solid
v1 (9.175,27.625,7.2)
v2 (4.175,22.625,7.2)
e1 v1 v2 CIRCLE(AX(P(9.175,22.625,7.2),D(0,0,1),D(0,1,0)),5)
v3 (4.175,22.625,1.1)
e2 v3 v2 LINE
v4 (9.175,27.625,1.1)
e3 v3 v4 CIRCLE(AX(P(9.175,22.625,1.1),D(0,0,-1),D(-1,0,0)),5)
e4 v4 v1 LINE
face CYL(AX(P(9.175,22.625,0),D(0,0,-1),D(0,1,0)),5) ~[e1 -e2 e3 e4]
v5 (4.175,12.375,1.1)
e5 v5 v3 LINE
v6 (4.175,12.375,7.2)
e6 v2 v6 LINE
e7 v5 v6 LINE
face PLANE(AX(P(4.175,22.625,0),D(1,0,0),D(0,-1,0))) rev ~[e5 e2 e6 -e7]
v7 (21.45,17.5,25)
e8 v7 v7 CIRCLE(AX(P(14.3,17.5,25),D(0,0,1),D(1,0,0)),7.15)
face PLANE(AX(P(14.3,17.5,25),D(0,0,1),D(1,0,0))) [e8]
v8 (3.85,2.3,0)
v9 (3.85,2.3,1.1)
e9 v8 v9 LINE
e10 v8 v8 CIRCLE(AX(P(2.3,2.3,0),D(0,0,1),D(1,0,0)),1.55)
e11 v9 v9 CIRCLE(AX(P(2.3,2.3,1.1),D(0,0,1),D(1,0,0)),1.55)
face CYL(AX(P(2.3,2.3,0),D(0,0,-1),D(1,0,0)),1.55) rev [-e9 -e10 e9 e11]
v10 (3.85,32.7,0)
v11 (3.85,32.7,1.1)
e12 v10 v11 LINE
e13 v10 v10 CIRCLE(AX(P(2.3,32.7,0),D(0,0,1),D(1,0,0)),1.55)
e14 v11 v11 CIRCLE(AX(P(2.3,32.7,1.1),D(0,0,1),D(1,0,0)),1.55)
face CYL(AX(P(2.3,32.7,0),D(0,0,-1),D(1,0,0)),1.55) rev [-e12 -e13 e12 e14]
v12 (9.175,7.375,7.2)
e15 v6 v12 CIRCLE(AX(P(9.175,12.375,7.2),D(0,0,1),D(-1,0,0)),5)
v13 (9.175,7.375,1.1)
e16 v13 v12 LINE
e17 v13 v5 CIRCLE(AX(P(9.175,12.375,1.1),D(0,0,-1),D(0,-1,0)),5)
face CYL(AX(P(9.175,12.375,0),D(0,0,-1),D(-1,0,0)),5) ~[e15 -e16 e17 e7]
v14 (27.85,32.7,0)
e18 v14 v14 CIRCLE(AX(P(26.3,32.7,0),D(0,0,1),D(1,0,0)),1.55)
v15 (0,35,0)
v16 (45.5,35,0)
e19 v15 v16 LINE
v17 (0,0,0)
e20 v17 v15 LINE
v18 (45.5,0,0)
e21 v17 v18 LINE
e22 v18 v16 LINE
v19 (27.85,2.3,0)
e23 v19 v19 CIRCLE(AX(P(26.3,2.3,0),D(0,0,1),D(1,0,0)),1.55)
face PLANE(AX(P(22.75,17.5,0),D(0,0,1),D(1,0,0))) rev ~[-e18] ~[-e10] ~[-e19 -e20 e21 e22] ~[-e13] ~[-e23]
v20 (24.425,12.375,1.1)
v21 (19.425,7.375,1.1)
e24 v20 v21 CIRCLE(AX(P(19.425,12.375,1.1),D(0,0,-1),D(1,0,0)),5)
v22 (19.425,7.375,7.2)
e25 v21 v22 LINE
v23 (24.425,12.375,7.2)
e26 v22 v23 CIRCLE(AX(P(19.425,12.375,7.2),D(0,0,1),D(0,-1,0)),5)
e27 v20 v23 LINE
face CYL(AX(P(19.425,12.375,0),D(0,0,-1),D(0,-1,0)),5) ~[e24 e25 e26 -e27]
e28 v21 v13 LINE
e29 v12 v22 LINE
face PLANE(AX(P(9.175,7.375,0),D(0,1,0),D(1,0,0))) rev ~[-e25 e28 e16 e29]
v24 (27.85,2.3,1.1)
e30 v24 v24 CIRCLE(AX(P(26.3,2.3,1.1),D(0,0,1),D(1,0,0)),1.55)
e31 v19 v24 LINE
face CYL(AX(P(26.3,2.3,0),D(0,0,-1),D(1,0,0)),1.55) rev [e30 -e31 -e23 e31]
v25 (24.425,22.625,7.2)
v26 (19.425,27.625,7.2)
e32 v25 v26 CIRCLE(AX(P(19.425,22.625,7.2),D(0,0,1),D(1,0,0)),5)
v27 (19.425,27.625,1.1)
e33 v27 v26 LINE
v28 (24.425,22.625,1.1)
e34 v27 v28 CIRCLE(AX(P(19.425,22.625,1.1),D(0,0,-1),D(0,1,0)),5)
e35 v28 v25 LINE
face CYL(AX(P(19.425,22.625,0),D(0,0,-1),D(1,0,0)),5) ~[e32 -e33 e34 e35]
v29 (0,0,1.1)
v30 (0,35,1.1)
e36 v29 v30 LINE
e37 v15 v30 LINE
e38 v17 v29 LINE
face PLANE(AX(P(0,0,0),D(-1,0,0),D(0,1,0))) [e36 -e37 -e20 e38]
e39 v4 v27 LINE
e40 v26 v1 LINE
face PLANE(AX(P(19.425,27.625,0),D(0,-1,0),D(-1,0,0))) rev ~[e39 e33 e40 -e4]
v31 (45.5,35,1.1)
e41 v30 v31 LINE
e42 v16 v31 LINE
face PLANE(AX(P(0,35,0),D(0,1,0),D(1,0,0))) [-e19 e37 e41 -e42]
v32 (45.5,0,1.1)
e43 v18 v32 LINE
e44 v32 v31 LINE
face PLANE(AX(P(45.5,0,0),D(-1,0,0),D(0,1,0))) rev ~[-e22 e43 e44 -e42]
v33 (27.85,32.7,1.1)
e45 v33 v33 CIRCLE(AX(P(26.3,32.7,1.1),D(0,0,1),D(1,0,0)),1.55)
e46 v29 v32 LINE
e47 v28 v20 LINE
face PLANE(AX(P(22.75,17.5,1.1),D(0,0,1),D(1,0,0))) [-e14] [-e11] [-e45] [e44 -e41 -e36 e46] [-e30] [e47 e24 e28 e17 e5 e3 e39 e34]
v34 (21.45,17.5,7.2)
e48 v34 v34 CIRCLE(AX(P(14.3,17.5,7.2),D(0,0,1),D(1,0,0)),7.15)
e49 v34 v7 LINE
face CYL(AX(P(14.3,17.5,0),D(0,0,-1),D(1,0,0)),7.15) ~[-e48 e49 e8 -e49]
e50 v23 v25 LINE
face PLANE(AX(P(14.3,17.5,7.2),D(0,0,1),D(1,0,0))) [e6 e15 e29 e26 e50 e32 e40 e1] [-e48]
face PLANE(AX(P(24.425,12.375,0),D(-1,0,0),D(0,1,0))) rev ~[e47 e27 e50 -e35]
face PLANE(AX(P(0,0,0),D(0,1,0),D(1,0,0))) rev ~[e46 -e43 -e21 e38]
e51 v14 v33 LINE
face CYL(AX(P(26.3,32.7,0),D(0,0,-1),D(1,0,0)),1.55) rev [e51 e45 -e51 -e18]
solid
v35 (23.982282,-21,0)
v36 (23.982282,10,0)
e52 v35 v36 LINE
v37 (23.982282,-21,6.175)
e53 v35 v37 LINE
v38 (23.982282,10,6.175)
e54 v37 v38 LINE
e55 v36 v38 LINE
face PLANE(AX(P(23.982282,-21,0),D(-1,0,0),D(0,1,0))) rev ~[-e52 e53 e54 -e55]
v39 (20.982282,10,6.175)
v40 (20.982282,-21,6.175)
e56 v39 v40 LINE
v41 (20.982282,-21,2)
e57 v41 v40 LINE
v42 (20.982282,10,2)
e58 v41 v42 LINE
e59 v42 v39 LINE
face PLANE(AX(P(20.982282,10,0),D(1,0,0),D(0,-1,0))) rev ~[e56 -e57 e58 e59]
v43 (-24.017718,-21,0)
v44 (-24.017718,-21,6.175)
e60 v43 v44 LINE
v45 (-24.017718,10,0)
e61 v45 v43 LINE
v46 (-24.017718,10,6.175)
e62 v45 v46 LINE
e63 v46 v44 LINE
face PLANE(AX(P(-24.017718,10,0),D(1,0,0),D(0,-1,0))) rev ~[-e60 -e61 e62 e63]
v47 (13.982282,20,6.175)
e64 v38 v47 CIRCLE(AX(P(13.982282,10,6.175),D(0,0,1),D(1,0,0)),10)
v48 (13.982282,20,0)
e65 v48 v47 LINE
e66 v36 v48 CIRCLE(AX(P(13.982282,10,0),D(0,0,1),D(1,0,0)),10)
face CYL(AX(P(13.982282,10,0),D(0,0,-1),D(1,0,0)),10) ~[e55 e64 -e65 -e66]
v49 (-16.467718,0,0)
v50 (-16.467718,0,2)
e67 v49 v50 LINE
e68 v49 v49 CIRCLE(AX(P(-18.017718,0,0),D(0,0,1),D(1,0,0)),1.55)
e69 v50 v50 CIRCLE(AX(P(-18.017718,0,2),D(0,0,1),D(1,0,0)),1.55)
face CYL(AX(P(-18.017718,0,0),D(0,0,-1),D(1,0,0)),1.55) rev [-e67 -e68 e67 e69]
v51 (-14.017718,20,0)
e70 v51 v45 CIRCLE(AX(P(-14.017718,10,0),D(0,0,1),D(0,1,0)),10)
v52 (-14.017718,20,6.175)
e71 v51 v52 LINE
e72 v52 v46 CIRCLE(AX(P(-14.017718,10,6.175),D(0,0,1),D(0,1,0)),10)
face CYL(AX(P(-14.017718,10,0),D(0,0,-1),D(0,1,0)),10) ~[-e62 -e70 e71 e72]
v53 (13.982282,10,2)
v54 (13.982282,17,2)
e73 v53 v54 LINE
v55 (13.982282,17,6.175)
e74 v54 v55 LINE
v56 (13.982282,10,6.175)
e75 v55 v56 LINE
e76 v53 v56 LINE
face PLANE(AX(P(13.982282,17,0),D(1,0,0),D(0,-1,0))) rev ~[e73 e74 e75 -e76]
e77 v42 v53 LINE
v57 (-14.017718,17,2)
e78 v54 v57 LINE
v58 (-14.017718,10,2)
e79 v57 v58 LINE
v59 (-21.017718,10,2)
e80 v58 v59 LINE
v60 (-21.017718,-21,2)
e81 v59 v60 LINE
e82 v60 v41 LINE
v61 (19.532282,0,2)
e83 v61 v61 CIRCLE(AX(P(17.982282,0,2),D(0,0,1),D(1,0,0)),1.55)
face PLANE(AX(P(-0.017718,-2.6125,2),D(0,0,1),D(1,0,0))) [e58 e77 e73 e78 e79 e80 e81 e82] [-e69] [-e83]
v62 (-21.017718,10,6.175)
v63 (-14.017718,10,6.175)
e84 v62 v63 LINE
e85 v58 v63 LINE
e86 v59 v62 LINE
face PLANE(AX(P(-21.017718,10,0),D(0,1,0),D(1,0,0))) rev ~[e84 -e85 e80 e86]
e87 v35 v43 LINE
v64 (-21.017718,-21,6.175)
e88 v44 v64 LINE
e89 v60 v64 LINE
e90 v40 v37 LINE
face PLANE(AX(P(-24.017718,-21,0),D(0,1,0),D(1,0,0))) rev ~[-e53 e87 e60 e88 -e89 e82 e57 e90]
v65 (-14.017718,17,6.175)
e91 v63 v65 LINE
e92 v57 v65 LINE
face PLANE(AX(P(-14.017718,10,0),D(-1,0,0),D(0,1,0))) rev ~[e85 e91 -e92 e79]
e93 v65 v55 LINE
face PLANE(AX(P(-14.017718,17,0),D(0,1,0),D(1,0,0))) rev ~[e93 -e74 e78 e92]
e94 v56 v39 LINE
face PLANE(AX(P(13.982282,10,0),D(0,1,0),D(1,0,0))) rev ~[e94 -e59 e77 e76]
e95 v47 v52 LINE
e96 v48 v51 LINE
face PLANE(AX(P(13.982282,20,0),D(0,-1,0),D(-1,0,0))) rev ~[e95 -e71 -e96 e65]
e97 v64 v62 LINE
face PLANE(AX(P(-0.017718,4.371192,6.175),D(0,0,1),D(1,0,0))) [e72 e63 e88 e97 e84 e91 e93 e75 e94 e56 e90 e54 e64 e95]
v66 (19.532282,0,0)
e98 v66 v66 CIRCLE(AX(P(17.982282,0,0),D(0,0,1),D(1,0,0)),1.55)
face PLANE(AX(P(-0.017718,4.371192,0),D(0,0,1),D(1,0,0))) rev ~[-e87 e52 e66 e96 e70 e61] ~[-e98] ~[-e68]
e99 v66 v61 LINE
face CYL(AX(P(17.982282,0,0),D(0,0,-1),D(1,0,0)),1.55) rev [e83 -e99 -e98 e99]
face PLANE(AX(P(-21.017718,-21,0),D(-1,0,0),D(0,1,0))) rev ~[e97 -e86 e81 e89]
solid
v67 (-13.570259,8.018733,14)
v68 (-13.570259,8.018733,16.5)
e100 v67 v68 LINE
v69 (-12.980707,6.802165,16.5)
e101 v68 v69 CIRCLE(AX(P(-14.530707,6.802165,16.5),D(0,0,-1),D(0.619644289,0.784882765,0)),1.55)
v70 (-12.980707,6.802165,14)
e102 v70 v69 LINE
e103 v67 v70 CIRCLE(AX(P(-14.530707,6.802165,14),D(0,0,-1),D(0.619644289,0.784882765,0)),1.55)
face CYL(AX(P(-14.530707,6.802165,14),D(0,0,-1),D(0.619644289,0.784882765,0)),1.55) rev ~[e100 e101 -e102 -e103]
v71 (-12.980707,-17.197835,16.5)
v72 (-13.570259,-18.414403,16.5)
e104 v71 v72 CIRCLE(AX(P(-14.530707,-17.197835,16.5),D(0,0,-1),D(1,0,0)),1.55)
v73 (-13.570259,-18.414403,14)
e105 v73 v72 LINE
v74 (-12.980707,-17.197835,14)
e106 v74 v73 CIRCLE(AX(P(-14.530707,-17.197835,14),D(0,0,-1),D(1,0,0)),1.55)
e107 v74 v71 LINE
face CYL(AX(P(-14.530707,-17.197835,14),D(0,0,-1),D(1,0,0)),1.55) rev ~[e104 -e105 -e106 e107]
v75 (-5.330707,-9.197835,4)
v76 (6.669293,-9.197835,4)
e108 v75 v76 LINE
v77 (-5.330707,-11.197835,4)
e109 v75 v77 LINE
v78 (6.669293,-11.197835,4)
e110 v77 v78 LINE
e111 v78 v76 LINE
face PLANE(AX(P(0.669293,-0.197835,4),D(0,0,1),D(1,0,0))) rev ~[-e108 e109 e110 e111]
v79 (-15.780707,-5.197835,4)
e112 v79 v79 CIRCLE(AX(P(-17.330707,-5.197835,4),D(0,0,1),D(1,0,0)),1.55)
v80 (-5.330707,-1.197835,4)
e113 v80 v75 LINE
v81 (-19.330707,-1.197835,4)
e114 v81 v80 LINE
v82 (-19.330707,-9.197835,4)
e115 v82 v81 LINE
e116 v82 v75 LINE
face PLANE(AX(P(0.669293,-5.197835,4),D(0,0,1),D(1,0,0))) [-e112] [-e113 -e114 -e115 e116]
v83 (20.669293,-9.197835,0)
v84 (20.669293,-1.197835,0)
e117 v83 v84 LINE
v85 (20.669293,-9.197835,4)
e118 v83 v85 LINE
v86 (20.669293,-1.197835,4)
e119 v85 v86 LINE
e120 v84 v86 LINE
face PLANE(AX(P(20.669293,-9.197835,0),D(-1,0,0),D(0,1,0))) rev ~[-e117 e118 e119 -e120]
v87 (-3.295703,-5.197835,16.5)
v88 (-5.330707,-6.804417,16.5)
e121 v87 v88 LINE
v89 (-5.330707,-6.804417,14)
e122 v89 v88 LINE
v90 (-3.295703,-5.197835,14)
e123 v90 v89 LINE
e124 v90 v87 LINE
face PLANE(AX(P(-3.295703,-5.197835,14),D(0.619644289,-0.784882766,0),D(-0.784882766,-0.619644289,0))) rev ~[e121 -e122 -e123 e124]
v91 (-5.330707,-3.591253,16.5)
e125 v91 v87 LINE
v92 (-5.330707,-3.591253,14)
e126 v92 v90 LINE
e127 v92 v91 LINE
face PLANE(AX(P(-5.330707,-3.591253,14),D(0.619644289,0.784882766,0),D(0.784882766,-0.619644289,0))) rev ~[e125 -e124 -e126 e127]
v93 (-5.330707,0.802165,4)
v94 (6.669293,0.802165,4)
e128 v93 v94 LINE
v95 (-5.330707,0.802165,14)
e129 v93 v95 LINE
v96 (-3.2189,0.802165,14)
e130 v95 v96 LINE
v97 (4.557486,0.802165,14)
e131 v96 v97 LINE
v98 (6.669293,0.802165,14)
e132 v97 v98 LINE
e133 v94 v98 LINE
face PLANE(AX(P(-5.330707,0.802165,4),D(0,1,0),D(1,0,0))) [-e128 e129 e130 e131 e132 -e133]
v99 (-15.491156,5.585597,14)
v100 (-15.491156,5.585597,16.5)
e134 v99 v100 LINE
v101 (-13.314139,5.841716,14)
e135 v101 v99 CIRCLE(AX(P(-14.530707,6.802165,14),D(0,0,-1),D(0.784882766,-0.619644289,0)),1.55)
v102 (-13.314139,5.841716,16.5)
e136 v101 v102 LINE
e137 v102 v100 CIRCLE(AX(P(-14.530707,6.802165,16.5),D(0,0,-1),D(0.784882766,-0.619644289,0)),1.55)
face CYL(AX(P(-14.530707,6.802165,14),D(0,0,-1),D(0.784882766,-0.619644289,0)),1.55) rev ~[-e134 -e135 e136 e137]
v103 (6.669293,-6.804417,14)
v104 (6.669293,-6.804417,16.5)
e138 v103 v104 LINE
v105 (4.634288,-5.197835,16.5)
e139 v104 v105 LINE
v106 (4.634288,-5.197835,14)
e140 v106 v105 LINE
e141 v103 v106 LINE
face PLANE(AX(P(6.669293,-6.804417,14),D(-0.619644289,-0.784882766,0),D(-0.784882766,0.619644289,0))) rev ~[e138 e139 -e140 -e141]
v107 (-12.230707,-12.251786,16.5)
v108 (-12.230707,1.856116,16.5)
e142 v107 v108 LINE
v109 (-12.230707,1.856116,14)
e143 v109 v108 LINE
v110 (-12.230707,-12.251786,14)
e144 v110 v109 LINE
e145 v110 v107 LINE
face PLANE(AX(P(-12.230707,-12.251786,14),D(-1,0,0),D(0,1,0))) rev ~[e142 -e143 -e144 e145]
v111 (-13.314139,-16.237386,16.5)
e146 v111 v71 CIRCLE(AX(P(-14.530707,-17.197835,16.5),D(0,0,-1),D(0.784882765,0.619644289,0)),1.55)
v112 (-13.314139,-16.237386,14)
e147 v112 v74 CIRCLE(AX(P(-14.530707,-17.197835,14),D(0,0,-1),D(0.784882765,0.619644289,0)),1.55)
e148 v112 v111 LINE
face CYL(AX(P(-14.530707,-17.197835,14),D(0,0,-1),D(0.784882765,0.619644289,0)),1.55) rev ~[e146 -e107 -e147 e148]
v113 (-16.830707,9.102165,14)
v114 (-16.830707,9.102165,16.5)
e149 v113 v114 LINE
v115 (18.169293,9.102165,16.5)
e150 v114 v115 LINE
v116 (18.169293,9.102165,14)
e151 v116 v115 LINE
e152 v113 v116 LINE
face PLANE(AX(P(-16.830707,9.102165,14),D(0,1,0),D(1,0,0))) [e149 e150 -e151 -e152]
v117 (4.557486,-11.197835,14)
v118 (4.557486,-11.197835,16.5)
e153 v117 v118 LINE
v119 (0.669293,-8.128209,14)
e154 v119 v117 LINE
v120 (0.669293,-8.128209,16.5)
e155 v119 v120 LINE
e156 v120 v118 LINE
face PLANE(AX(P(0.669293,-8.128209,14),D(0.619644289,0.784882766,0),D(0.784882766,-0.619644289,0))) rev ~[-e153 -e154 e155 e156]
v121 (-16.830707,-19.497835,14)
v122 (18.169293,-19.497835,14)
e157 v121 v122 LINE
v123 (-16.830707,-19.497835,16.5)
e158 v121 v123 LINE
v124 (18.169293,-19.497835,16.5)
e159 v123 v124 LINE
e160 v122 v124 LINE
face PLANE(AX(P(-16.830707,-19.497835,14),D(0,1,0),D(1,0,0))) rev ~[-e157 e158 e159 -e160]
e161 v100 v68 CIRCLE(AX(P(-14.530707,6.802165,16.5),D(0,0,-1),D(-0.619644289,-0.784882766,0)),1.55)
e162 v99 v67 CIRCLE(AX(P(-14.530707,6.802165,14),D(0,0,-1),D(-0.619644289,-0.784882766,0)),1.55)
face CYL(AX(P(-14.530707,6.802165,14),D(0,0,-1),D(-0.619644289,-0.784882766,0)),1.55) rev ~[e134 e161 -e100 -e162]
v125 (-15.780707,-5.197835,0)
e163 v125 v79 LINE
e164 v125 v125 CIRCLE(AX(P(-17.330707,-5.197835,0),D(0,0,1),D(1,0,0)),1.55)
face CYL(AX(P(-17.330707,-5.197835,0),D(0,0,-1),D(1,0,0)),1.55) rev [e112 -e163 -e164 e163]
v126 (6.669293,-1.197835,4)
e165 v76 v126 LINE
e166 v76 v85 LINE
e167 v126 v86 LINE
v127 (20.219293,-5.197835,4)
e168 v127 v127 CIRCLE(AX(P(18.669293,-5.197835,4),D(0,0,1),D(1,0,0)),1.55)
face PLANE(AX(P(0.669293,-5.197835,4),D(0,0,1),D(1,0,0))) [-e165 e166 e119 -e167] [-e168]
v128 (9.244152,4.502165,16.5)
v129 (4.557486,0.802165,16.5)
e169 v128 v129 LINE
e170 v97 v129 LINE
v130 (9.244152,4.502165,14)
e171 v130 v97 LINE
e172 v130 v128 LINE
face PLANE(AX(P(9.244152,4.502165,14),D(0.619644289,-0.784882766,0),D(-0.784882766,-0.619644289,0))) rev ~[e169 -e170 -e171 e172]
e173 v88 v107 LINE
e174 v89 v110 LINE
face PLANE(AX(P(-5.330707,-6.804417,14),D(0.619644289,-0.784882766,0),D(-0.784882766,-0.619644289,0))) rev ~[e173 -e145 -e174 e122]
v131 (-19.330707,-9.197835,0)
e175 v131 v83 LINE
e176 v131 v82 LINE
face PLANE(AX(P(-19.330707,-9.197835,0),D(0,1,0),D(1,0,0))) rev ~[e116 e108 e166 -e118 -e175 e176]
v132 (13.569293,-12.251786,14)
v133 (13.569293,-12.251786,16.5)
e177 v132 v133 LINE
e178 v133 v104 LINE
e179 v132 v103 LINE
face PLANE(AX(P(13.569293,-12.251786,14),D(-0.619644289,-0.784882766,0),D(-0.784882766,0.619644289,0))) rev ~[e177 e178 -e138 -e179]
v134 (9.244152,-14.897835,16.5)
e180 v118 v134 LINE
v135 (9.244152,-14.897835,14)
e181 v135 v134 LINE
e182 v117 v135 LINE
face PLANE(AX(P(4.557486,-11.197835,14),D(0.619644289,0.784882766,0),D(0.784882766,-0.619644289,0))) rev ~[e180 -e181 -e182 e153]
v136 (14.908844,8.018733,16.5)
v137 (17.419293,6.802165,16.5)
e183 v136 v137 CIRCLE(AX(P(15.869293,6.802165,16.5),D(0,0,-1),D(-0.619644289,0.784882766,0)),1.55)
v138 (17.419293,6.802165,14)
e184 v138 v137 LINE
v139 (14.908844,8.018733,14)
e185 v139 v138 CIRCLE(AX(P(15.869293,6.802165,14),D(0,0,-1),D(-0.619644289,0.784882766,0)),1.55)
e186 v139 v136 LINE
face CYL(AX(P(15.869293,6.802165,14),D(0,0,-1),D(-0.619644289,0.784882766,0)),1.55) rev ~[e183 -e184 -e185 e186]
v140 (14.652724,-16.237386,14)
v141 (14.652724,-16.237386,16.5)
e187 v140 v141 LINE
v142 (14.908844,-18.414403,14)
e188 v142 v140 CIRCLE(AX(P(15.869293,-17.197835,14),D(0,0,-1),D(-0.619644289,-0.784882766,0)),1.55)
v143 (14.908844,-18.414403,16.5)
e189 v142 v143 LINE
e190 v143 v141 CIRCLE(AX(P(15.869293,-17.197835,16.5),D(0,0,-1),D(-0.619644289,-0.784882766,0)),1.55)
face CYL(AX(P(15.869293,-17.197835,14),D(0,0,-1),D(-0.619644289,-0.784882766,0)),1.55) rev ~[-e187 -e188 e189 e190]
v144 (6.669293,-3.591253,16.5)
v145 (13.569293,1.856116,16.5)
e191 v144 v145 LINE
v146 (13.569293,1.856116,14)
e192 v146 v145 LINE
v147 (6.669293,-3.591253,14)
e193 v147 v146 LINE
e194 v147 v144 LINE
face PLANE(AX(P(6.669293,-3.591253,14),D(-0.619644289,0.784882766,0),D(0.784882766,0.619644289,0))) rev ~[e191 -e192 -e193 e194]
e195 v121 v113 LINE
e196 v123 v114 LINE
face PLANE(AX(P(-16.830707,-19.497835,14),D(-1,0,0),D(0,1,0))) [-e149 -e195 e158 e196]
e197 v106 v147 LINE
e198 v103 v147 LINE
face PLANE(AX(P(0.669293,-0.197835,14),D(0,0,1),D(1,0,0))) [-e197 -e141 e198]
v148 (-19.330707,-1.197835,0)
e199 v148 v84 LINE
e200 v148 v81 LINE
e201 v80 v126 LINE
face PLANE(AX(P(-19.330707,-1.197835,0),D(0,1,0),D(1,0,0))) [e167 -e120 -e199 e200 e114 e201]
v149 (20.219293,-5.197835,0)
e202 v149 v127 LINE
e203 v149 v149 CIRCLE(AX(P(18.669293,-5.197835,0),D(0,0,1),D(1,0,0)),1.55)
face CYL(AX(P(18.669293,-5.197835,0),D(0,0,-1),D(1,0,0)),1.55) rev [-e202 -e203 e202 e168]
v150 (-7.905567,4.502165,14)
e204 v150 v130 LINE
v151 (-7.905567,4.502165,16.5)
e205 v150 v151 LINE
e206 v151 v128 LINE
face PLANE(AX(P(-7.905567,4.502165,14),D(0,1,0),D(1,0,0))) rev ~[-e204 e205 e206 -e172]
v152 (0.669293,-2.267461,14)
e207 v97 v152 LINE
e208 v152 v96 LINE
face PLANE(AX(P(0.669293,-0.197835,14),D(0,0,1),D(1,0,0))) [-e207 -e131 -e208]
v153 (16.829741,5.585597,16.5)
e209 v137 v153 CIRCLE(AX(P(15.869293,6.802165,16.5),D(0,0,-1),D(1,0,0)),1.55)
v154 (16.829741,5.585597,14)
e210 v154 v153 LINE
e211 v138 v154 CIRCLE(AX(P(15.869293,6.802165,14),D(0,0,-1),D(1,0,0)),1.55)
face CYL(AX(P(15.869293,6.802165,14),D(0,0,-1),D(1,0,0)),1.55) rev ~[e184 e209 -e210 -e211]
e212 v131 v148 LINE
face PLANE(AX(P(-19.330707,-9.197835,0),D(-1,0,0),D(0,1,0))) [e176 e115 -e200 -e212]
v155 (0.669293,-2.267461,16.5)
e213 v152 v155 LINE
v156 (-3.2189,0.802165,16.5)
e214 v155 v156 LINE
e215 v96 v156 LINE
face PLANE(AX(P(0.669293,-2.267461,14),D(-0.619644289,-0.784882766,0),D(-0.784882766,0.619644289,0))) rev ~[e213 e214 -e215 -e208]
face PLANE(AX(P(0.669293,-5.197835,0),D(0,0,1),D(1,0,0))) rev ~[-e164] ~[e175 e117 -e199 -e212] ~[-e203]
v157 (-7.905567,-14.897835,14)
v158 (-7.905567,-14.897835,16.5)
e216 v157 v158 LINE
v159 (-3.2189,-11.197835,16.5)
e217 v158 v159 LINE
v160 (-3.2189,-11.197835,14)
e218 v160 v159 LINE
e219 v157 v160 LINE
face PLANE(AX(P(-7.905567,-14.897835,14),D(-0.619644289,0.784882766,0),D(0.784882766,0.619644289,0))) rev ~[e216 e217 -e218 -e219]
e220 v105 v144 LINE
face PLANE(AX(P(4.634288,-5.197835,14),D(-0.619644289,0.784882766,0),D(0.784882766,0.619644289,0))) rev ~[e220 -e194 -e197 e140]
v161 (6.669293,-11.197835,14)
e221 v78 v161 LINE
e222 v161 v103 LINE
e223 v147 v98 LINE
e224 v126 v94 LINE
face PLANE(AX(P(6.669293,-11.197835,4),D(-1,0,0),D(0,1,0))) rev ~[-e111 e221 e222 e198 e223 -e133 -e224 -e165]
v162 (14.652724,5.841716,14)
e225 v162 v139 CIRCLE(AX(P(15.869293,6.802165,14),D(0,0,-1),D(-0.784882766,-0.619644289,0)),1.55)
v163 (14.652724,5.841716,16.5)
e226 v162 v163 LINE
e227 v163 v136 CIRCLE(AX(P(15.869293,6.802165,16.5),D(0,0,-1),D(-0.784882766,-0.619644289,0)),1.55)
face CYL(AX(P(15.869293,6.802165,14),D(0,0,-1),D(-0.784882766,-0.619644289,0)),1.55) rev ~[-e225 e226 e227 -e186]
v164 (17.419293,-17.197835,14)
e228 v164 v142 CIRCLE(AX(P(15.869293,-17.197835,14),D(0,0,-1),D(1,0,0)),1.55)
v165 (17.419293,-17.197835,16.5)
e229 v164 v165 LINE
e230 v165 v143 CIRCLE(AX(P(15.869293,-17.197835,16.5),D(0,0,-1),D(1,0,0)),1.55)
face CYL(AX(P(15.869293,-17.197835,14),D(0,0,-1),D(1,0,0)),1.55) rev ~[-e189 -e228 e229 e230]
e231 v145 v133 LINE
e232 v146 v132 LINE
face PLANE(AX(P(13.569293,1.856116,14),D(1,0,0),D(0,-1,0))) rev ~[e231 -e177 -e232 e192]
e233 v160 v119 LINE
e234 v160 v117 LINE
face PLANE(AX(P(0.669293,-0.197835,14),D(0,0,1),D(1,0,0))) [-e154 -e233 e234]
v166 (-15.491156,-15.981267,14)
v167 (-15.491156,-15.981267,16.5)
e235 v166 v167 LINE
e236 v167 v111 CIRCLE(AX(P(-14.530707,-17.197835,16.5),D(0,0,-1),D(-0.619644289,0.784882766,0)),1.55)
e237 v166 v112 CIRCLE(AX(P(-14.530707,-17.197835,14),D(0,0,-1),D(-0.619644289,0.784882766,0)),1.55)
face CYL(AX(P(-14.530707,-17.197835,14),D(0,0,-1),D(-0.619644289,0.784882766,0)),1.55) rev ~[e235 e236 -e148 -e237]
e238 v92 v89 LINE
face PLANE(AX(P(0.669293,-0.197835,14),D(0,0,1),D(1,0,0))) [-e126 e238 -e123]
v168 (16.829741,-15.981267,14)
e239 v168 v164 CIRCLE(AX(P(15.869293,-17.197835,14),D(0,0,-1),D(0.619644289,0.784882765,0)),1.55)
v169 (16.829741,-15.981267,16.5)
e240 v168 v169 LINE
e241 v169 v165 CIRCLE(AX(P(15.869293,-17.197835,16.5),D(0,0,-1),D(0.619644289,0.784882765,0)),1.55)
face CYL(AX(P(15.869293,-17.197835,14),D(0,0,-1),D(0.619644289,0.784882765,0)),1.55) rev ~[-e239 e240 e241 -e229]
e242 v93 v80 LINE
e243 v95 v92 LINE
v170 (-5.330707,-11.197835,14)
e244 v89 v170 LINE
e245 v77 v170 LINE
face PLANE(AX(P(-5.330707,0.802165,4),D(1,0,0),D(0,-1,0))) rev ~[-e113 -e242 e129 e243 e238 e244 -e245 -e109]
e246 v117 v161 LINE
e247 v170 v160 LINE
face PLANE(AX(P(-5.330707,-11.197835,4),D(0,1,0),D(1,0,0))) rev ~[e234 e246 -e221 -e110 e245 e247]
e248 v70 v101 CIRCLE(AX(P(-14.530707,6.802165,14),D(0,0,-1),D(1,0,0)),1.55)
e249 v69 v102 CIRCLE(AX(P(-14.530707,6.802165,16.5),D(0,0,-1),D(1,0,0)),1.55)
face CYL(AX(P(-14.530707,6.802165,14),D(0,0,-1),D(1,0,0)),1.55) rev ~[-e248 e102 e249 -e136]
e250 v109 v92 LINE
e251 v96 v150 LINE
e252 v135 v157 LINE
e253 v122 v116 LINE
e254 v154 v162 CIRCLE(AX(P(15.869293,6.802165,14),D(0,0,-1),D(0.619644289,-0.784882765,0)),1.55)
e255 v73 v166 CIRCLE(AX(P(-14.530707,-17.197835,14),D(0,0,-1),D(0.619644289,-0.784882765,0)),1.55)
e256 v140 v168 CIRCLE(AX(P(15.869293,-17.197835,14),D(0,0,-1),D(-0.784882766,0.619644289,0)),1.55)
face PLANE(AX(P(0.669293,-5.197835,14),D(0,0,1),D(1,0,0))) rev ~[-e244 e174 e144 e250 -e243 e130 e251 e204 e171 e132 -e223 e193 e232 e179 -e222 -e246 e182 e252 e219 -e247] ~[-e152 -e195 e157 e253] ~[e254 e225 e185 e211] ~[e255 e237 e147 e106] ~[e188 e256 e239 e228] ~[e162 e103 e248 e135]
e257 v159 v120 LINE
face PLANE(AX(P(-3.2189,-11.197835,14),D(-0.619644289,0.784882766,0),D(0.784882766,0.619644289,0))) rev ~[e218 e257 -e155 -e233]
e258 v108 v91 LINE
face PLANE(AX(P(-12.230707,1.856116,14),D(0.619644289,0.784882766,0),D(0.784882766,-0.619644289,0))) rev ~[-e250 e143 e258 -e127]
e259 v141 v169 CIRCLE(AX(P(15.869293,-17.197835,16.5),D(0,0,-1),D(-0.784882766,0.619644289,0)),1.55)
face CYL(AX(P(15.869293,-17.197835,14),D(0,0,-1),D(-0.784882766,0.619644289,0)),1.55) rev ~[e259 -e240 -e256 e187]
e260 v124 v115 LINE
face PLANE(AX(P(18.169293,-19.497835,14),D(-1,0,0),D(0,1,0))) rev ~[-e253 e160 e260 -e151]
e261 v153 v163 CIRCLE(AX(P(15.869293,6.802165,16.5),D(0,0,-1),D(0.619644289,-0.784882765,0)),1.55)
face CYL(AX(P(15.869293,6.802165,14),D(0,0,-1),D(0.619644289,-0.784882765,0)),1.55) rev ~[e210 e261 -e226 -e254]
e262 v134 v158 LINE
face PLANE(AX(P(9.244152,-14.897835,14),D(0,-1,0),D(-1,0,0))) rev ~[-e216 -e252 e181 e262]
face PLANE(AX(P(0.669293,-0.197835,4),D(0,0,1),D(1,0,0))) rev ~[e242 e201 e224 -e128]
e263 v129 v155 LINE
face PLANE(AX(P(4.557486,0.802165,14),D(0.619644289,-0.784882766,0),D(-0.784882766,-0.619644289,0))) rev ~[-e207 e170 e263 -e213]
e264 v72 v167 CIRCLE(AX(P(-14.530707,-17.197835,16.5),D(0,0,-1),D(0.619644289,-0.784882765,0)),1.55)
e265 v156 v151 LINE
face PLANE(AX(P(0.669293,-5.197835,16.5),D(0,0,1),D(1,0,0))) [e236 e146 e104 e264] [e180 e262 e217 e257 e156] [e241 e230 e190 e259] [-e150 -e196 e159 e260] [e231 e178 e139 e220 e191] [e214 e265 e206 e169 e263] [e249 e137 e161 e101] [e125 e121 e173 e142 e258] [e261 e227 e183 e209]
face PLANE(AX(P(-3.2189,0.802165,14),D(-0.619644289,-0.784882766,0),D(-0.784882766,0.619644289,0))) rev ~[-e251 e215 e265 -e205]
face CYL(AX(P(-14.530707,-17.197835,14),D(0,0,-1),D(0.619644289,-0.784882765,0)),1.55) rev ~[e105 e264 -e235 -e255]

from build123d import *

# Parameters (mm, degrees)
F0_W      = 45.5
F0_H      = 35
F0_R      = 1.55
F1_DEPTH  = 1.1
F0_R_2    = 7.15
F2_DEPTH  = 7.2
F3_DEPTH  = 25
F4_R      = 1.55
F5_DEPTH  = 2
F6_DEPTH  = 6.175
F7_W      = 40
F7_H      = 8
F7_R      = 1.55
F8_DEPTH  = 4
F9_W      = 12
F9_H      = 2
F9_H_2    = 8
F10_DEPTH = 10
F11_W     = 35
F11_H     = 28.6
F12_DEPTH = 2.5


with BuildPart() as f1:
    # F0 (on Top) → F1 (new body)
    with BuildSketch(Plane.XY):
        with Locations((22.75, 17.5)):
            Rectangle(F0_W, F0_H)
        with Locations((2.3, 2.3)):
            Circle(F0_R, mode=Mode.SUBTRACT)
        with Locations((26.3, 2.3)):
            Circle(F0_R, mode=Mode.SUBTRACT)
        with BuildLine():
            Line((9.175, 27.625), (19.425, 27.625))
            ThreePointArc((19.425, 27.625), (22.9605339059, 26.1605339059), (24.425, 22.625))
            Line((24.425, 22.625), (24.425, 12.375))
            ThreePointArc((24.425, 12.375), (22.9605339059, 8.8394660941), (19.425, 7.375))
            Line((19.425, 7.375), (9.175, 7.375))
            ThreePointArc((9.175, 7.375), (5.6394660941, 8.8394660941), (4.175, 12.375))
            Line((4.175, 12.375), (4.175, 22.625))
            ThreePointArc((4.175, 22.625), (5.6394660941, 26.1605339059), (9.175, 27.625))
        make_face(mode=Mode.SUBTRACT)
        with Locations((2.3, 32.7)):
            Circle(F0_R, mode=Mode.SUBTRACT)
        with Locations((26.3, 32.7)):
            Circle(F0_R, mode=Mode.SUBTRACT)
    extrude(amount=F1_DEPTH)

    # F0 (on Top) → F2 (join)
    with BuildSketch(Plane.XY):
        with BuildLine():
            ThreePointArc((24.425, 22.625), (22.9605339059, 26.1605339059), (19.425, 27.625))
            Line((19.425, 27.625), (9.175, 27.625))
            ThreePointArc((9.175, 27.625), (5.6394660941, 26.1605339059), (4.175, 22.625))
            Line((4.175, 22.625), (4.175, 12.375))
            ThreePointArc((4.175, 12.375), (5.6394660941, 8.8394660941), (9.175, 7.375))
            Line((9.175, 7.375), (19.425, 7.375))
            ThreePointArc((19.425, 7.375), (22.9605339059, 8.8394660941), (24.425, 12.375))
            Line((24.425, 12.375), (24.425, 22.625))
        make_face()
        with Locations((14.3, 17.5)):
            Circle(F0_R_2, mode=Mode.SUBTRACT)
    extrude(amount=F2_DEPTH)

    # F0 (on Top) → F3 (join)
    with BuildSketch(Plane.XY):
        with Locations((14.3, 17.5)):
            Circle(F0_R_2)
    extrude(amount=F3_DEPTH)


with BuildPart() as f5:
    # F4 (on Top) → F5 (new body)
    with BuildSketch(Plane.XY):
        Polygon((-21.0177182555, 10), (-21.0177182555, -21), (20.9822817445, -21), (20.9822817445, 10), (13.9822817445, 10), (13.9822817445, 17), (-14.0177182555, 17), (-14.0177182555, 10), align=None)
        with Locations((-18.0177182555, 0)):
            Circle(F4_R, mode=Mode.SUBTRACT)
        with Locations((17.9822817445, 0)):
            Circle(F4_R, mode=Mode.SUBTRACT)
    extrude(amount=F5_DEPTH)

    # F4 (on Top) → F6 (join)
    with BuildSketch(Plane.XY):
        with BuildLine():
            Line((13.9822817445, 20), (-14.0177182555, 20))
            ThreePointArc((-14.0177182555, 20), (-21.0887860674, 17.0710678119), (-24.0177182555, 10))
            Line((-24.0177182555, 10), (-24.0177182555, -21))
            Line((-24.0177182555, -21), (-21.0177182555, -21))
            Line((-21.0177182555, -21), (-21.0177182555, 10))
            ThreePointArc((-21.0177182555, 10), (-18.9674657238, 14.9497474683), (-14.0177182555, 17))
            Line((-14.0177182555, 17), (13.9822817445, 17))
            ThreePointArc((13.9822817445, 17), (18.9320292128, 14.9497474683), (20.9822817445, 10))
            Line((20.9822817445, 10), (20.9822817445, -21))
            Line((20.9822817445, -21), (23.9822817445, -21))
            Line((23.9822817445, -21), (23.9822817445, 10))
            ThreePointArc((23.9822817445, 10), (21.0533495563, 17.0710678119), (13.9822817445, 20))
        make_face()
        with BuildLine():
            Line((13.9822817445, 10), (20.9822817445, 10))
            ThreePointArc((20.9822817445, 10), (18.9320292128, 14.9497474683), (13.9822817445, 17))
            Line((13.9822817445, 17), (13.9822817445, 10))
        make_face()
        with BuildLine():
            ThreePointArc((-14.0177182555, 17), (-18.9674657238, 14.9497474683), (-21.0177182555, 10))
            Line((-21.0177182555, 10), (-14.0177182555, 10))
            Line((-14.0177182555, 10), (-14.0177182555, 17))
        make_face()
    extrude(amount=F6_DEPTH)


with BuildPart() as f8:
    # F7 (on Top) → F8 (new body)
    with BuildSketch(Plane.XY):
        with Locations((0.6692926586, -5.1978348792)):
            Rectangle(F7_W, F7_H)
        with Locations((-17.3307073414, -5.1978348792)):
            Circle(F7_R, mode=Mode.SUBTRACT)
        with Locations((18.6692926586, -5.1978348792)):
            Circle(F7_R, mode=Mode.SUBTRACT)
    extrude(amount=F8_DEPTH)

    # F9 (on face) → F10 (join)
    with BuildSketch(Plane.XY.offset(4)):
        with Locations((0.6692926586, -0.1978348792)):
            Rectangle(F9_W, F9_H)
        with Locations((0.6692926586, -10.1978348792)):
            Rectangle(F9_W, F9_H)
        with Locations((0.6692926586, -5.1978348792)):
            Rectangle(F9_W, F9_H_2)
    extrude(amount=F10_DEPTH)

    # F11 (on face) → F12 (join)
    with BuildSketch(Plane.XY.offset(14)):
        with Locations((0.6692926586, -5.1978348792)):
            Rectangle(F11_W, F11_H)
        with BuildLine():
            Line((-12.2307073414, -12.2517855581), (-12.2307073414, 1.8561157997))
            Line((-12.2307073414, 1.8561157997), (-16.0531033423, 4.8737968531))
            Line((-16.0531033423, 4.8737968531), (-15.4911559887, 5.5855968343))
            ThreePointArc((-15.4911559887, 5.5855968343), (-15.747275628, 7.7626137681), (-13.5702586941, 8.0187334074))
            Line((-13.5702586941, 8.0187334074), (-13.1055254777, 8.6073954816))
            Line((-13.1055254777, 8.6073954816), (-7.9055670208, 4.5021651208))
            Line((-7.9055670208, 4.5021651208), (9.2441523379, 4.5021651208))
            Line((9.2441523379, 4.5021651208), (14.4441107948, 8.6073954816))
            Line((14.4441107948, 8.6073954816), (14.9088440113, 8.0187334074))
            ThreePointArc((14.9088440113, 8.0187334074), (16.5452381433, 8.1970119589), (17.4192926586, 6.8021651208))
            ThreePointArc((17.4192926586, 6.8021651208), (17.2641394966, 6.1262196361), (16.8297413059, 5.5855968343))
            Line((16.8297413059, 5.5855968343), (17.3916886594, 4.8737968531))
            Line((17.3916886594, 4.8737968531), (13.5692926586, 1.8561157997))
            Line((13.5692926586, 1.8561157997), (13.5692926586, -12.2517855581))
            Line((13.5692926586, -12.2517855581), (17.3916886594, -15.2694666114))
            Line((17.3916886594, -15.2694666114), (16.8297413059, -15.9812665926))
            ThreePointArc((16.8297413059, -15.9812665926), (17.2641394966, -16.5218893944), (17.4192926586, -17.1978348792))
            ThreePointArc((17.4192926586, -17.1978348792), (16.5452381433, -18.5926817172), (14.9088440113, -18.4144031657))
            Line((14.9088440113, -18.4144031657), (14.4441107948, -19.0030652399))
            Line((14.4441107948, -19.0030652399), (9.2441523379, -14.8978348792))
            Line((9.2441523379, -14.8978348792), (-7.9055670208, -14.8978348792))
            Line((-7.9055670208, -14.8978348792), (-13.1055254777, -19.0030652399))
            Line((-13.1055254777, -19.0030652399), (-13.5702586941, -18.4144031657))
            ThreePointArc((-13.5702586941, -18.4144031657), (-15.747275628, -18.1582835265), (-15.4911559887, -15.9812665926))
            Line((-15.4911559887, -15.9812665926), (-16.0531033423, -15.2694666114))
            Line((-16.0531033423, -15.2694666114), (-12.2307073414, -12.2517855581))
        make_face(mode=Mode.SUBTRACT)
        Polygon((12.9559593252, 4.5021651208), (9.2441523379, 4.5021651208), (4.5574856712, 0.8021651208), (6.6692926586, 0.8021651208), (6.6692926586, -0.4609927739), align=None)
        Polygon((13.5692926586, 4.5021651208), (12.9559593252, 4.5021651208), (6.6692926586, -0.4609927739), (6.6692926586, -3.5912526213), (13.5692926586, 1.8561157997), align=None)
        Polygon((-5.3307073414, 0.8021651208), (-5.3307073414, -0.4609927739), (0.6692926586, -5.1978348792), (6.6692926586, -0.4609927739), (6.6692926586, 0.8021651208), (4.5574856712, 0.8021651208), (0.6692926586, -2.2674609418), (-3.2189003541, 0.8021651208), align=None)
        Polygon((6.6692926586, -0.4609927739), (0.6692926586, -5.1978348792), (6.6692926586, -9.9346769844), (6.6692926586, -6.804417137), (4.6342884653, -5.1978348792), (6.6692926586, -3.5912526213), align=None)
        Polygon((-7.9055670208, 4.5021651208), (-11.6173740081, 4.5021651208), (-5.3307073414, -0.4609927739), (-5.3307073414, 0.8021651208), (-3.2189003541, 0.8021651208), align=None)
        Polygon((-11.6173740081, 4.5021651208), (-12.2307073414, 4.5021651208), (-12.2307073414, 1.8561157997), (-5.3307073414, -3.5912526213), (-5.3307073414, -0.4609927739), align=None)
        Polygon((-5.3307073414, -6.804417137), (-12.2307073414, -12.2517855581), (-12.2307073414, -14.8978348792), (-11.6173740081, -14.8978348792), (-5.3307073414, -9.9346769844), align=None)
        Polygon((-5.3307073414, -9.9346769844), (-11.6173740081, -14.8978348792), (-7.9055670208, -14.8978348792), (-3.2189003541, -11.1978348792), (-5.3307073414, -11.1978348792), align=None)
        Polygon((6.6692926586, -9.9346769844), (0.6692926586, -5.1978348792), (-5.3307073414, -9.9346769844), (-5.3307073414, -11.1978348792), (-3.2189003541, -11.1978348792), (0.6692926586, -8.1282088165), (4.5574856712, -11.1978348792), (6.6692926586, -11.1978348792), align=None)
        Polygon((-5.3307073414, -0.4609927739), (-5.3307073414, -3.5912526213), (-3.2957031482, -5.1978348792), (-5.3307073414, -6.804417137), (-5.3307073414, -9.9346769844), (0.6692926586, -5.1978348792), align=None)
        Polygon((12.9559593252, -14.8978348792), (6.6692926586, -9.9346769844), (6.6692926586, -11.1978348792), (4.5574856712, -11.1978348792), (9.2441523379, -14.8978348792), align=None)
        Polygon((6.6692926586, -6.804417137), (6.6692926586, -9.9346769844), (12.9559593252, -14.8978348792), (13.5692926586, -14.8978348792), (13.5692926586, -12.2517855581), align=None)
        with BuildLine():
            Line((-12.2307073414, 1.8561157997), (-12.2307073414, 4.5021651208))
            Line((-12.2307073414, 4.5021651208), (-11.6173740081, 4.5021651208))
            Line((-11.6173740081, 4.5021651208), (-13.3141390549, 5.8417164735))
            ThreePointArc((-13.3141390549, 5.8417164735), (-14.3496034077, 5.2627816841), (-15.4911559887, 5.5855968343))
            Line((-15.4911559887, 5.5855968343), (-16.0531033423, 4.8737968531))
            Line((-16.0531033423, 4.8737968531), (-12.2307073414, 1.8561157997))
        make_face()
        with BuildLine():
            Line((-13.3141390549, 5.8417164735), (-11.6173740081, 4.5021651208))
            Line((-11.6173740081, 4.5021651208), (-7.9055670208, 4.5021651208))
            Line((-7.9055670208, 4.5021651208), (-13.1055254777, 8.6073954816))
            Line((-13.1055254777, 8.6073954816), (-13.5702586941, 8.0187334074))
            ThreePointArc((-13.5702586941, 8.0187334074), (-13.1358605034, 7.4781106056), (-12.9807073414, 6.8021651208))
            ThreePointArc((-12.9807073414, 6.8021651208), (-13.0664360475, 6.2938250989), (-13.3141390549, 5.8417164735))
        make_face()
        with BuildLine():
            Line((-12.2307073414, -14.8978348792), (-12.2307073414, -12.2517855581))
            Line((-12.2307073414, -12.2517855581), (-16.0531033423, -15.2694666114))
            Line((-16.0531033423, -15.2694666114), (-15.4911559887, -15.9812665926))
            ThreePointArc((-15.4911559887, -15.9812665926), (-14.3496034077, -15.6584514425), (-13.3141390549, -16.2373862319))
            Line((-13.3141390549, -16.2373862319), (-11.6173740081, -14.8978348792))
            Line((-11.6173740081, -14.8978348792), (-12.2307073414, -14.8978348792))
        make_face()
        with BuildLine():
            Line((-7.9055670208, -14.8978348792), (-11.6173740081, -14.8978348792))
            Line((-11.6173740081, -14.8978348792), (-13.3141390549, -16.2373862319))
            ThreePointArc((-13.3141390549, -16.2373862319), (-13.0664360475, -16.6894948572), (-12.9807073414, -17.1978348792))
            ThreePointArc((-12.9807073414, -17.1978348792), (-13.1358605034, -17.8737803639), (-13.5702586941, -18.4144031657))
            Line((-13.5702586941, -18.4144031657), (-13.1055254777, -19.0030652399))
            Line((-13.1055254777, -19.0030652399), (-7.9055670208, -14.8978348792))
        make_face()
        with BuildLine():
            Line((14.652724372, -16.2373862319), (12.9559593252, -14.8978348792))
            Line((12.9559593252, -14.8978348792), (9.2441523379, -14.8978348792))
            Line((9.2441523379, -14.8978348792), (14.4441107948, -19.0030652399))
            Line((14.4441107948, -19.0030652399), (14.9088440113, -18.4144031657))
            ThreePointArc((14.9088440113, -18.4144031657), (14.3299092219, -17.3789388129), (14.652724372, -16.2373862319))
        make_face()
        with BuildLine():
            Line((13.5692926586, -14.8978348792), (12.9559593252, -14.8978348792))
            Line((12.9559593252, -14.8978348792), (14.652724372, -16.2373862319))
            ThreePointArc((14.652724372, -16.2373862319), (15.6881887248, -15.6584514425), (16.8297413059, -15.9812665926))
            Line((16.8297413059, -15.9812665926), (17.3916886594, -15.2694666114))
            Line((17.3916886594, -15.2694666114), (13.5692926586, -12.2517855581))
            Line((13.5692926586, -12.2517855581), (13.5692926586, -14.8978348792))
        make_face()
        with BuildLine():
            Line((14.4441107948, 8.6073954816), (9.2441523379, 4.5021651208))
            Line((9.2441523379, 4.5021651208), (12.9559593252, 4.5021651208))
            Line((12.9559593252, 4.5021651208), (14.652724372, 5.8417164735))
            ThreePointArc((14.652724372, 5.8417164735), (14.3299092219, 6.9832690546), (14.9088440113, 8.0187334074))
            Line((14.9088440113, 8.0187334074), (14.4441107948, 8.6073954816))
        make_face()
        with BuildLine():
            Line((14.652724372, 5.8417164735), (12.9559593252, 4.5021651208))
            Line((12.9559593252, 4.5021651208), (13.5692926586, 4.5021651208))
            Line((13.5692926586, 4.5021651208), (13.5692926586, 1.8561157997))
            Line((13.5692926586, 1.8561157997), (17.3916886594, 4.8737968531))
            Line((17.3916886594, 4.8737968531), (16.8297413059, 5.5855968343))
            ThreePointArc((16.8297413059, 5.5855968343), (15.6881887248, 5.2627816841), (14.652724372, 5.8417164735))
        make_face()
    extrude(amount=F12_DEPTH)


solid = Compound([f1.part, f5.part, f8.part])
